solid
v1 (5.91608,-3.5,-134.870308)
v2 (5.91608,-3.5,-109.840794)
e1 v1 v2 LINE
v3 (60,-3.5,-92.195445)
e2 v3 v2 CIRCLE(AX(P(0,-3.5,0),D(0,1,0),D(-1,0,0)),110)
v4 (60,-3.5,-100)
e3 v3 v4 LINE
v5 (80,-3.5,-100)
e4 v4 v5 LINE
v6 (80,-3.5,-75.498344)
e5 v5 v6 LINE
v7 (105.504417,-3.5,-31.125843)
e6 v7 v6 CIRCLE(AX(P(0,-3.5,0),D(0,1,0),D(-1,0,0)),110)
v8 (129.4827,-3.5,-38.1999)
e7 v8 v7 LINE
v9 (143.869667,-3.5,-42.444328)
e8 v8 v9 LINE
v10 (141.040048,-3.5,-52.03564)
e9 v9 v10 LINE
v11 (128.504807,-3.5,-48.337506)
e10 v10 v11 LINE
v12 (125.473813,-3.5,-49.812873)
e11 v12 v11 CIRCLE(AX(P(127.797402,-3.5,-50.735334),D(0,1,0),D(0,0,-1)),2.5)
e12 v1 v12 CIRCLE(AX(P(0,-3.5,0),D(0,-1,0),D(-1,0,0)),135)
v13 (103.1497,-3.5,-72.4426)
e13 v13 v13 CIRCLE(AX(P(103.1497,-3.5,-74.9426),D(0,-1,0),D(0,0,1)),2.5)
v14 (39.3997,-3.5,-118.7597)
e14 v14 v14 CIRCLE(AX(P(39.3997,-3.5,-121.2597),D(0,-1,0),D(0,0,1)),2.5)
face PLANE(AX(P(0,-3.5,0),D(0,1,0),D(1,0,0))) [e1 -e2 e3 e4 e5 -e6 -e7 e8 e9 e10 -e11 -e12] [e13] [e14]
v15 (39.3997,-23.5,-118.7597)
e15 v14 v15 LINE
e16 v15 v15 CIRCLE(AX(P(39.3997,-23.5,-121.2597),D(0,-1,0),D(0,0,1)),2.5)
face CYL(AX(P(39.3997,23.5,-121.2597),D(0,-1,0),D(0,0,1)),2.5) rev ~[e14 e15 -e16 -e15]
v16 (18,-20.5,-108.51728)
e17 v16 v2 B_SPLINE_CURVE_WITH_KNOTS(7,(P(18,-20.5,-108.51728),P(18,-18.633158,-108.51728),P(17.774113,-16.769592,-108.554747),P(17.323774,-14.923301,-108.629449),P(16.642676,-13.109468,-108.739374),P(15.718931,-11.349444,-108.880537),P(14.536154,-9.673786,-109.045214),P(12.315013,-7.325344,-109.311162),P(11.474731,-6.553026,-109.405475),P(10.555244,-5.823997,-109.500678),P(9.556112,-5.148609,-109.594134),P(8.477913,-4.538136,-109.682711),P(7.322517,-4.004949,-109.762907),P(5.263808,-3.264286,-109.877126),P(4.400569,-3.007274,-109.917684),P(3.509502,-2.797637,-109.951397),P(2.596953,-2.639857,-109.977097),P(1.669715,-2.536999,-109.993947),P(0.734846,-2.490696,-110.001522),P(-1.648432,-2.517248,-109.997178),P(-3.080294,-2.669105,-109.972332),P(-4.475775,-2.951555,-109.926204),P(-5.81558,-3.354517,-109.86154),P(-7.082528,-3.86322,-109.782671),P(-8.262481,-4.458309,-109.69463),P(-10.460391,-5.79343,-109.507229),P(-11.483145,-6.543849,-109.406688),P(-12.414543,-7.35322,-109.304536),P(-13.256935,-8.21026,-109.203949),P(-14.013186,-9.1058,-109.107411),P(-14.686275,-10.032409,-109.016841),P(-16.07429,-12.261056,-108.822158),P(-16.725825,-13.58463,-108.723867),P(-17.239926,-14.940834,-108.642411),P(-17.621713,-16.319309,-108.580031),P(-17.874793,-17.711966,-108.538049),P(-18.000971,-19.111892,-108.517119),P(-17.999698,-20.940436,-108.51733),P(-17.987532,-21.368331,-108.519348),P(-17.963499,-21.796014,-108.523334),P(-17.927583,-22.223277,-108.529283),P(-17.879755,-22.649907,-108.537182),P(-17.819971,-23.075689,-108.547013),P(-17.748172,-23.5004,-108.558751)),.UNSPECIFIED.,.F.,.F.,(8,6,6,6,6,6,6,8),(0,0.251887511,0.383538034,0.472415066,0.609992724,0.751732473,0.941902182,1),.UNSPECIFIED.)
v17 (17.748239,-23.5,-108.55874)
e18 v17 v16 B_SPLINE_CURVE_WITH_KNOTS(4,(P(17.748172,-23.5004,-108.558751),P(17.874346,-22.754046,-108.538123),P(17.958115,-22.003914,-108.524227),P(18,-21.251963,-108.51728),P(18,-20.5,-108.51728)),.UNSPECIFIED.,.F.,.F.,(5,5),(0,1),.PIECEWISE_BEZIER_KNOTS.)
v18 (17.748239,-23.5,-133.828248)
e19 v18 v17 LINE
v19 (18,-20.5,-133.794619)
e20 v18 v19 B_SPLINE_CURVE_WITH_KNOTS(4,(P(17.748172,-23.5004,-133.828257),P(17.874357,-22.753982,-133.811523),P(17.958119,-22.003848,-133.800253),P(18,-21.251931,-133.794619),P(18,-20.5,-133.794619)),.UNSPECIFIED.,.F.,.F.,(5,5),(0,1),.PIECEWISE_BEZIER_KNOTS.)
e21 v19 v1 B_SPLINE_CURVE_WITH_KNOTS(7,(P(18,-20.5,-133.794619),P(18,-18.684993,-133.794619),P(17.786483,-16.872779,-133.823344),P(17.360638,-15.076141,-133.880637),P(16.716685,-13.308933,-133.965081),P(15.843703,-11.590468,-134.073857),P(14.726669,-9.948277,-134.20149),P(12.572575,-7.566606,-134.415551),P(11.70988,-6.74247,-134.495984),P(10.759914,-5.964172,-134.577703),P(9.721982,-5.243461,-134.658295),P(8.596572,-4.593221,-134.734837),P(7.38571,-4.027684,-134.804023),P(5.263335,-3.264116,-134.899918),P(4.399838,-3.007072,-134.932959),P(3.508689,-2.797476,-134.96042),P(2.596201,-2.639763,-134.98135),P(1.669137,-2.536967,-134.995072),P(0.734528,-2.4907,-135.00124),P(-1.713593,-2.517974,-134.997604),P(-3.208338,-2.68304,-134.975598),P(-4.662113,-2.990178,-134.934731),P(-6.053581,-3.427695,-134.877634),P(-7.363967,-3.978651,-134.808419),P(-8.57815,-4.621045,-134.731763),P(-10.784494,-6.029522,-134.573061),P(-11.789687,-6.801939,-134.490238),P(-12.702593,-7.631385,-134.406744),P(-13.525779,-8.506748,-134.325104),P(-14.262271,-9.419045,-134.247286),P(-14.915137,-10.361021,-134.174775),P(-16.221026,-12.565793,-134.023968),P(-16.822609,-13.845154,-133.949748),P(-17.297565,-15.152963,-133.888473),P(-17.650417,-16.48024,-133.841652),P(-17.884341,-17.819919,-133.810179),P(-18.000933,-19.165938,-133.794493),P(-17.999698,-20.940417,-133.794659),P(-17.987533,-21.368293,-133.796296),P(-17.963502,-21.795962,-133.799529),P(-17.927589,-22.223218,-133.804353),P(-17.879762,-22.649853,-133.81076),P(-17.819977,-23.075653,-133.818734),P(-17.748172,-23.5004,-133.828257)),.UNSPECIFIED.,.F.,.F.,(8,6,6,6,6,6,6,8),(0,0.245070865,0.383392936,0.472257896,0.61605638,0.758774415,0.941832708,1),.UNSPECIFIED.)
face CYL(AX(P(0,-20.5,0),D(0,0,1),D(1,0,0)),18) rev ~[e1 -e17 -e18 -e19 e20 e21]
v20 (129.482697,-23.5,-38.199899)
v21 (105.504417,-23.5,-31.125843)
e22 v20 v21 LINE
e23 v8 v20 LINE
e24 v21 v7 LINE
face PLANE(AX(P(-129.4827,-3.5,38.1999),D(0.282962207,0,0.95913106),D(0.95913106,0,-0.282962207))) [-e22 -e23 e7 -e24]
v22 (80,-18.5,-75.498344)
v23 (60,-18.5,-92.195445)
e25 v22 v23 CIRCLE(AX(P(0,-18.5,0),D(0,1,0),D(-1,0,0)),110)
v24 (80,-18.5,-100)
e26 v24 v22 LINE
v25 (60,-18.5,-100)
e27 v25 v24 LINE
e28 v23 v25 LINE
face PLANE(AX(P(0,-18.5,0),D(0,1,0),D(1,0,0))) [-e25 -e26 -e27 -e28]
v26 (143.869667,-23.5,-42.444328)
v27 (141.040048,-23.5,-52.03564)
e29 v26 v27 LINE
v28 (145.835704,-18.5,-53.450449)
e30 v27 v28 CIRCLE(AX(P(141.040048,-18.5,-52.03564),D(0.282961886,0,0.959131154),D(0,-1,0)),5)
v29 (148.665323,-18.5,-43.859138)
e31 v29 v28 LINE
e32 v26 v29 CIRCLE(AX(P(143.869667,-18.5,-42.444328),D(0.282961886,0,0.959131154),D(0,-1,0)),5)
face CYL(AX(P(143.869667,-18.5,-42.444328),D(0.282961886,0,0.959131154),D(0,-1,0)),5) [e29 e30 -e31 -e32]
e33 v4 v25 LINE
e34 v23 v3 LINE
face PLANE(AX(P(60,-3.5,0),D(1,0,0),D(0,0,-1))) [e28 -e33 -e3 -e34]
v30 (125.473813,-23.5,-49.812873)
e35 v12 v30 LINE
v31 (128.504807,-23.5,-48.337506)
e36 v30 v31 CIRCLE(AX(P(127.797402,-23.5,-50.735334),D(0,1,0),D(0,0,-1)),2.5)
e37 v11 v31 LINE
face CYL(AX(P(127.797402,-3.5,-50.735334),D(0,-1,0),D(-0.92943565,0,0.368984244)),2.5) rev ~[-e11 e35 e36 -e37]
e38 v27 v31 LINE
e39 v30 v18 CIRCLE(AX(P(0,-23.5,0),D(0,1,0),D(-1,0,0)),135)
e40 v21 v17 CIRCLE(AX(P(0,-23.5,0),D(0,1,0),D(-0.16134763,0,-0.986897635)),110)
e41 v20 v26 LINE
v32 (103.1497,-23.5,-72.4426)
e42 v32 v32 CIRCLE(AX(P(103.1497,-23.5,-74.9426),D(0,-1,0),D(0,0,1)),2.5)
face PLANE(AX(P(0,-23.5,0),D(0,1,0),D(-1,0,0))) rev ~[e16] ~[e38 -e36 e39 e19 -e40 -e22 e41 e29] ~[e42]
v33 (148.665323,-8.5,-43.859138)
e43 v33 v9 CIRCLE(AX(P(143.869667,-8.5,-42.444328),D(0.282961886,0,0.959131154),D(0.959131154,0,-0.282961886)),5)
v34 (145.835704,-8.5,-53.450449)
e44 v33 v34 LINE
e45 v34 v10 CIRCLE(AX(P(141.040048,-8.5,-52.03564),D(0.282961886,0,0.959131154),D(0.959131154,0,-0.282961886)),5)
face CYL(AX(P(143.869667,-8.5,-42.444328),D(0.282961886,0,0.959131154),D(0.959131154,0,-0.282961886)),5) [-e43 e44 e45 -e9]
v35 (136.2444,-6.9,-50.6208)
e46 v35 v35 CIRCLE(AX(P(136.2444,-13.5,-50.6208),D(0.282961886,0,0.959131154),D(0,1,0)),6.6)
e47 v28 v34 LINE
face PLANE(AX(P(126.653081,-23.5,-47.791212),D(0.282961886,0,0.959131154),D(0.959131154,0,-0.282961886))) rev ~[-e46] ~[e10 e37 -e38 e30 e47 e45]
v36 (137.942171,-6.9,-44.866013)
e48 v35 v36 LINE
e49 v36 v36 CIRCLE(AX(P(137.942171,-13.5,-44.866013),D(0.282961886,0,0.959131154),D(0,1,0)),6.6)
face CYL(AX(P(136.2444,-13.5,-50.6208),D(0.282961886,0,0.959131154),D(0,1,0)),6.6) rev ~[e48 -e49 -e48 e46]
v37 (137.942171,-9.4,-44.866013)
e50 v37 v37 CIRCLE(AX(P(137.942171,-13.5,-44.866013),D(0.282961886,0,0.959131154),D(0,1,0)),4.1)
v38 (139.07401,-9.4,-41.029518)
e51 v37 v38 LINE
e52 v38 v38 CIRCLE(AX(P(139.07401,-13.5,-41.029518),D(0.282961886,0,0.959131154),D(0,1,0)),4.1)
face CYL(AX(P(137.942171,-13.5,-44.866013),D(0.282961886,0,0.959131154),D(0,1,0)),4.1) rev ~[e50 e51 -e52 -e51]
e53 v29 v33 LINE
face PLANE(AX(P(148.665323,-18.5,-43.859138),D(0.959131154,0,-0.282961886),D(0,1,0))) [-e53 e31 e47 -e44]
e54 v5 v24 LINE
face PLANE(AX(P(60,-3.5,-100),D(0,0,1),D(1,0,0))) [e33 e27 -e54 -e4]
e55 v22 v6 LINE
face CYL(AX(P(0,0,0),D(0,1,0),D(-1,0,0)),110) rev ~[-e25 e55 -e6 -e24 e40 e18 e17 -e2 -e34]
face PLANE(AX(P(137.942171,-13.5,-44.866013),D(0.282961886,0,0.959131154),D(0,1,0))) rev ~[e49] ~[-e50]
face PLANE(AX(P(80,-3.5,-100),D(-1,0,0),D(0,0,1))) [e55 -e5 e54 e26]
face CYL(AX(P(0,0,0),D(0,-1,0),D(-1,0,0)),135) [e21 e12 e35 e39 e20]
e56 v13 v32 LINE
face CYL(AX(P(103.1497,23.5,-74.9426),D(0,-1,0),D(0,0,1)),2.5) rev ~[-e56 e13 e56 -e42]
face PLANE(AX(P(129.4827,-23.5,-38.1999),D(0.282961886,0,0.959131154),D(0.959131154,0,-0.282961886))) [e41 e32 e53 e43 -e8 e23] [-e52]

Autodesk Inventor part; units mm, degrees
ref_plane "YZ Plane" through (0, 0, 0) normal (1, 0, 0) x (0, 1, 0)
ref_plane "XZ Plane" through (0, 0, 0) normal (0, 1, 0) x (-1, 0, 0)
ref_plane "XY Plane" through (0, 0, 0) normal (0, 0, 1) x (1, 0, 0)
sketch "Sketch1" plane through (0, 0, 0) normal (0, 1, 0) x (-1, 0, 0)
  circle A0 centre (0, 0) radius 135
  circle A1 centre (0, 0) radius 110
  dimension "d0" = 270
  dimension "d1" = 220
extrude "Extrusion1" add sketch "Sketch1" along normal mid plane 47
sketch "Sketch2" plane through (0, 0, 0) normal (0, 0, 1) x (1, 0, 0)
  circle A0 centre (0, -20.5) radius 18
  line L0 (-135, -23.5) -> (135, -23.5) projected
  dimension "d4" = 36
  dimension "d38" = 3
extrude "Extrusion2" cut sketch "Sketch2" against normal through all
sketch "Sketch3" plane through (0, 23.5, 0) normal (0, 1, 0) x (1, 0, 0)
  circle A0 centre (0, 0) radius 127.5
  circle A1 centre (-127.5, 0) radius 2
  circle A2 centre (-103.1497, -74.9426) radius 2
  circle A3 centre (-39.3997, -121.2597) radius 2
  circle A4 centre (39.3997, -121.2597) radius 2
  circle A5 centre (103.1497, -74.9426) radius 2
  circle A6 centre (127.5, 0) radius 2
  circle A7 centre (103.1497, 74.9426) radius 2
  circle A8 centre (39.3997, 121.2597) radius 2
  circle A9 centre (-39.3997, 121.2597) radius 2
  circle A10 centre (-103.1497, 74.9426) radius 2
  dimension "d7" = 255
  dimension "d8" = 4
  dimension "d11" = 360
hole "Hole1" at (39.3997, 23.5, 121.2597) at (-39.3997, 23.5, 121.2597) at (-103.1497, 23.5, 74.9426) at (-127.5, 23.5, 0) at (-103.1497, 23.5, -74.9426) at (-39.3997, 23.5, -121.2597) at (39.3997, 23.5, -121.2597) at (103.1497, 23.5, -74.9426) at (127.5, 23.5, 0) at (103.1497, 23.5, 74.9426) direction (0, -1, 0) diameter 5 end through all
sketch "Sketch4" plane through (0, 23.5, 0) normal (0, 1, 0) x (1, 0, 0)
  circle A0 centre (0, 0) radius 140
extrude "Extrusion3" cut sketch "Sketch4" against normal blind 27
sketch "Sketch7" plane through (0, -3.5, 0) normal (0, 1, 0) x (1, 0, 0)
  line L0 (0, 0) -> (70, 0)
  line L1 (80, -100) -> (60, -100)
  line L2 (60, -100) -> (60, 100)
  line L3 (60, 100) -> (80, 100)
  line L4 (80, 100) -> (80, -100)
  line L5 (80, -100) -> (60, 100) construction
  line L6 (60, -100) -> (80, 100) construction
  dimension "d39" = 70
  dimension "d40" = 20
  dimension "d41" = 200
extrude "Extrusion7" cut sketch "Sketch7" against normal blind 15
sketch "Sketch8" plane through (0, -3.5, 0) normal (0, 1, 0) x (1, 0, 0)
  line L0 (-129.4827, -38.1999) -> (129.4827, 38.1999)
  line L1 (0, 134.8703) -> (0, -135)
  arc A0 (-5.9161, 134.8703) -> (5.9161, 134.8703) centre (0, 0) ccw projected
extrude "Extrusion8" cut sketch "Sketch8" against normal through all
sketch "Sketch9" plane through (0, -3.5, 0) normal (0, 1, 0) x (1, 0, 0)
  line L0 (-129.4827, -38.1999) -> (-105.5044, -31.1258) projected
  arc A0 (-5.9161, 109.8408) -> (-105.5044, -31.1258) centre (0, 0) ccw projected
  line L1 (-5.9161, 134.8703) -> (-5.9161, 109.8408) projected
  arc A1 (-5.9161, 134.8703) -> (-129.4827, -38.1999) centre (0, 0) ccw projected
  circle A2 centre (-39.3997, 121.2597) radius 2.5 projected
  circle A3 centre (-103.1497, 74.9426) radius 2.5 projected
  circle A4 centre (-127.5, 0) radius 2.5 projected
extrude "Extrusion9" cut sketch "Sketch9" against normal through all
sketch "Sketch10" plane through (129.4827, -23.5, -38.1999) normal (0.2829619, 0, 0.9591312) x (0.9591312, 0, -0.2829619)
  line L0 (0, 0) -> (-25, 0) projected
  line L1 (-2.5, 0) -> (15, 0)
  line L2 (20, 5) -> (20, 15)
  line L3 (15, 20) -> (-2.5, 20)
  line L4 (-2.5, 20) -> (-2.5, 0)
  line L5 (0, 20) -> (0, 0) projected
  arc A0 (20, 15) -> (15, 20) centre (15, 15) ccw
  arc A1 (15, 0) -> (20, 5) centre (15, 5) ccw
  point P0 (-135, 23.5)
  point P1 (20, 20)
  point P2 (20, 0)
  point P3 (0, 0)
  dimension "d48" = 22.5
  dimension "d49" = 20
  dimension "d50" = 20
  dimension "d53" = 5
extrude "Extrusion10" add sketch "Sketch10" against normal blind 10
fillet "Fillet1" radius 2.5 1 edges at (126.2974, -13.5, -47.6862)
sketch "Sketch11" plane through (126.6531, -23.5, -47.7912) normal (-0.2829619, 0, -0.9591312) x (-0.9591312, 0, 0.2829619)
  line L0 (-1.9306, 20) -> (-15, 20) projected
  line L1 (-20, 15) -> (-20, 5) projected
  point P0 (135, 23.5)
  point P1 (-10, 10)
  dimension "d55" = 10
  dimension "d56" = 10
hole "Hole2" at (136.2444, -13.5, -50.6208) direction (0.2829619, 0, 0.9591312) diameter 8.2 end through all counterbore diameter 13.2 counterbore depth 6
properties part number "Cylinder Spacer Bottom_Q2"
